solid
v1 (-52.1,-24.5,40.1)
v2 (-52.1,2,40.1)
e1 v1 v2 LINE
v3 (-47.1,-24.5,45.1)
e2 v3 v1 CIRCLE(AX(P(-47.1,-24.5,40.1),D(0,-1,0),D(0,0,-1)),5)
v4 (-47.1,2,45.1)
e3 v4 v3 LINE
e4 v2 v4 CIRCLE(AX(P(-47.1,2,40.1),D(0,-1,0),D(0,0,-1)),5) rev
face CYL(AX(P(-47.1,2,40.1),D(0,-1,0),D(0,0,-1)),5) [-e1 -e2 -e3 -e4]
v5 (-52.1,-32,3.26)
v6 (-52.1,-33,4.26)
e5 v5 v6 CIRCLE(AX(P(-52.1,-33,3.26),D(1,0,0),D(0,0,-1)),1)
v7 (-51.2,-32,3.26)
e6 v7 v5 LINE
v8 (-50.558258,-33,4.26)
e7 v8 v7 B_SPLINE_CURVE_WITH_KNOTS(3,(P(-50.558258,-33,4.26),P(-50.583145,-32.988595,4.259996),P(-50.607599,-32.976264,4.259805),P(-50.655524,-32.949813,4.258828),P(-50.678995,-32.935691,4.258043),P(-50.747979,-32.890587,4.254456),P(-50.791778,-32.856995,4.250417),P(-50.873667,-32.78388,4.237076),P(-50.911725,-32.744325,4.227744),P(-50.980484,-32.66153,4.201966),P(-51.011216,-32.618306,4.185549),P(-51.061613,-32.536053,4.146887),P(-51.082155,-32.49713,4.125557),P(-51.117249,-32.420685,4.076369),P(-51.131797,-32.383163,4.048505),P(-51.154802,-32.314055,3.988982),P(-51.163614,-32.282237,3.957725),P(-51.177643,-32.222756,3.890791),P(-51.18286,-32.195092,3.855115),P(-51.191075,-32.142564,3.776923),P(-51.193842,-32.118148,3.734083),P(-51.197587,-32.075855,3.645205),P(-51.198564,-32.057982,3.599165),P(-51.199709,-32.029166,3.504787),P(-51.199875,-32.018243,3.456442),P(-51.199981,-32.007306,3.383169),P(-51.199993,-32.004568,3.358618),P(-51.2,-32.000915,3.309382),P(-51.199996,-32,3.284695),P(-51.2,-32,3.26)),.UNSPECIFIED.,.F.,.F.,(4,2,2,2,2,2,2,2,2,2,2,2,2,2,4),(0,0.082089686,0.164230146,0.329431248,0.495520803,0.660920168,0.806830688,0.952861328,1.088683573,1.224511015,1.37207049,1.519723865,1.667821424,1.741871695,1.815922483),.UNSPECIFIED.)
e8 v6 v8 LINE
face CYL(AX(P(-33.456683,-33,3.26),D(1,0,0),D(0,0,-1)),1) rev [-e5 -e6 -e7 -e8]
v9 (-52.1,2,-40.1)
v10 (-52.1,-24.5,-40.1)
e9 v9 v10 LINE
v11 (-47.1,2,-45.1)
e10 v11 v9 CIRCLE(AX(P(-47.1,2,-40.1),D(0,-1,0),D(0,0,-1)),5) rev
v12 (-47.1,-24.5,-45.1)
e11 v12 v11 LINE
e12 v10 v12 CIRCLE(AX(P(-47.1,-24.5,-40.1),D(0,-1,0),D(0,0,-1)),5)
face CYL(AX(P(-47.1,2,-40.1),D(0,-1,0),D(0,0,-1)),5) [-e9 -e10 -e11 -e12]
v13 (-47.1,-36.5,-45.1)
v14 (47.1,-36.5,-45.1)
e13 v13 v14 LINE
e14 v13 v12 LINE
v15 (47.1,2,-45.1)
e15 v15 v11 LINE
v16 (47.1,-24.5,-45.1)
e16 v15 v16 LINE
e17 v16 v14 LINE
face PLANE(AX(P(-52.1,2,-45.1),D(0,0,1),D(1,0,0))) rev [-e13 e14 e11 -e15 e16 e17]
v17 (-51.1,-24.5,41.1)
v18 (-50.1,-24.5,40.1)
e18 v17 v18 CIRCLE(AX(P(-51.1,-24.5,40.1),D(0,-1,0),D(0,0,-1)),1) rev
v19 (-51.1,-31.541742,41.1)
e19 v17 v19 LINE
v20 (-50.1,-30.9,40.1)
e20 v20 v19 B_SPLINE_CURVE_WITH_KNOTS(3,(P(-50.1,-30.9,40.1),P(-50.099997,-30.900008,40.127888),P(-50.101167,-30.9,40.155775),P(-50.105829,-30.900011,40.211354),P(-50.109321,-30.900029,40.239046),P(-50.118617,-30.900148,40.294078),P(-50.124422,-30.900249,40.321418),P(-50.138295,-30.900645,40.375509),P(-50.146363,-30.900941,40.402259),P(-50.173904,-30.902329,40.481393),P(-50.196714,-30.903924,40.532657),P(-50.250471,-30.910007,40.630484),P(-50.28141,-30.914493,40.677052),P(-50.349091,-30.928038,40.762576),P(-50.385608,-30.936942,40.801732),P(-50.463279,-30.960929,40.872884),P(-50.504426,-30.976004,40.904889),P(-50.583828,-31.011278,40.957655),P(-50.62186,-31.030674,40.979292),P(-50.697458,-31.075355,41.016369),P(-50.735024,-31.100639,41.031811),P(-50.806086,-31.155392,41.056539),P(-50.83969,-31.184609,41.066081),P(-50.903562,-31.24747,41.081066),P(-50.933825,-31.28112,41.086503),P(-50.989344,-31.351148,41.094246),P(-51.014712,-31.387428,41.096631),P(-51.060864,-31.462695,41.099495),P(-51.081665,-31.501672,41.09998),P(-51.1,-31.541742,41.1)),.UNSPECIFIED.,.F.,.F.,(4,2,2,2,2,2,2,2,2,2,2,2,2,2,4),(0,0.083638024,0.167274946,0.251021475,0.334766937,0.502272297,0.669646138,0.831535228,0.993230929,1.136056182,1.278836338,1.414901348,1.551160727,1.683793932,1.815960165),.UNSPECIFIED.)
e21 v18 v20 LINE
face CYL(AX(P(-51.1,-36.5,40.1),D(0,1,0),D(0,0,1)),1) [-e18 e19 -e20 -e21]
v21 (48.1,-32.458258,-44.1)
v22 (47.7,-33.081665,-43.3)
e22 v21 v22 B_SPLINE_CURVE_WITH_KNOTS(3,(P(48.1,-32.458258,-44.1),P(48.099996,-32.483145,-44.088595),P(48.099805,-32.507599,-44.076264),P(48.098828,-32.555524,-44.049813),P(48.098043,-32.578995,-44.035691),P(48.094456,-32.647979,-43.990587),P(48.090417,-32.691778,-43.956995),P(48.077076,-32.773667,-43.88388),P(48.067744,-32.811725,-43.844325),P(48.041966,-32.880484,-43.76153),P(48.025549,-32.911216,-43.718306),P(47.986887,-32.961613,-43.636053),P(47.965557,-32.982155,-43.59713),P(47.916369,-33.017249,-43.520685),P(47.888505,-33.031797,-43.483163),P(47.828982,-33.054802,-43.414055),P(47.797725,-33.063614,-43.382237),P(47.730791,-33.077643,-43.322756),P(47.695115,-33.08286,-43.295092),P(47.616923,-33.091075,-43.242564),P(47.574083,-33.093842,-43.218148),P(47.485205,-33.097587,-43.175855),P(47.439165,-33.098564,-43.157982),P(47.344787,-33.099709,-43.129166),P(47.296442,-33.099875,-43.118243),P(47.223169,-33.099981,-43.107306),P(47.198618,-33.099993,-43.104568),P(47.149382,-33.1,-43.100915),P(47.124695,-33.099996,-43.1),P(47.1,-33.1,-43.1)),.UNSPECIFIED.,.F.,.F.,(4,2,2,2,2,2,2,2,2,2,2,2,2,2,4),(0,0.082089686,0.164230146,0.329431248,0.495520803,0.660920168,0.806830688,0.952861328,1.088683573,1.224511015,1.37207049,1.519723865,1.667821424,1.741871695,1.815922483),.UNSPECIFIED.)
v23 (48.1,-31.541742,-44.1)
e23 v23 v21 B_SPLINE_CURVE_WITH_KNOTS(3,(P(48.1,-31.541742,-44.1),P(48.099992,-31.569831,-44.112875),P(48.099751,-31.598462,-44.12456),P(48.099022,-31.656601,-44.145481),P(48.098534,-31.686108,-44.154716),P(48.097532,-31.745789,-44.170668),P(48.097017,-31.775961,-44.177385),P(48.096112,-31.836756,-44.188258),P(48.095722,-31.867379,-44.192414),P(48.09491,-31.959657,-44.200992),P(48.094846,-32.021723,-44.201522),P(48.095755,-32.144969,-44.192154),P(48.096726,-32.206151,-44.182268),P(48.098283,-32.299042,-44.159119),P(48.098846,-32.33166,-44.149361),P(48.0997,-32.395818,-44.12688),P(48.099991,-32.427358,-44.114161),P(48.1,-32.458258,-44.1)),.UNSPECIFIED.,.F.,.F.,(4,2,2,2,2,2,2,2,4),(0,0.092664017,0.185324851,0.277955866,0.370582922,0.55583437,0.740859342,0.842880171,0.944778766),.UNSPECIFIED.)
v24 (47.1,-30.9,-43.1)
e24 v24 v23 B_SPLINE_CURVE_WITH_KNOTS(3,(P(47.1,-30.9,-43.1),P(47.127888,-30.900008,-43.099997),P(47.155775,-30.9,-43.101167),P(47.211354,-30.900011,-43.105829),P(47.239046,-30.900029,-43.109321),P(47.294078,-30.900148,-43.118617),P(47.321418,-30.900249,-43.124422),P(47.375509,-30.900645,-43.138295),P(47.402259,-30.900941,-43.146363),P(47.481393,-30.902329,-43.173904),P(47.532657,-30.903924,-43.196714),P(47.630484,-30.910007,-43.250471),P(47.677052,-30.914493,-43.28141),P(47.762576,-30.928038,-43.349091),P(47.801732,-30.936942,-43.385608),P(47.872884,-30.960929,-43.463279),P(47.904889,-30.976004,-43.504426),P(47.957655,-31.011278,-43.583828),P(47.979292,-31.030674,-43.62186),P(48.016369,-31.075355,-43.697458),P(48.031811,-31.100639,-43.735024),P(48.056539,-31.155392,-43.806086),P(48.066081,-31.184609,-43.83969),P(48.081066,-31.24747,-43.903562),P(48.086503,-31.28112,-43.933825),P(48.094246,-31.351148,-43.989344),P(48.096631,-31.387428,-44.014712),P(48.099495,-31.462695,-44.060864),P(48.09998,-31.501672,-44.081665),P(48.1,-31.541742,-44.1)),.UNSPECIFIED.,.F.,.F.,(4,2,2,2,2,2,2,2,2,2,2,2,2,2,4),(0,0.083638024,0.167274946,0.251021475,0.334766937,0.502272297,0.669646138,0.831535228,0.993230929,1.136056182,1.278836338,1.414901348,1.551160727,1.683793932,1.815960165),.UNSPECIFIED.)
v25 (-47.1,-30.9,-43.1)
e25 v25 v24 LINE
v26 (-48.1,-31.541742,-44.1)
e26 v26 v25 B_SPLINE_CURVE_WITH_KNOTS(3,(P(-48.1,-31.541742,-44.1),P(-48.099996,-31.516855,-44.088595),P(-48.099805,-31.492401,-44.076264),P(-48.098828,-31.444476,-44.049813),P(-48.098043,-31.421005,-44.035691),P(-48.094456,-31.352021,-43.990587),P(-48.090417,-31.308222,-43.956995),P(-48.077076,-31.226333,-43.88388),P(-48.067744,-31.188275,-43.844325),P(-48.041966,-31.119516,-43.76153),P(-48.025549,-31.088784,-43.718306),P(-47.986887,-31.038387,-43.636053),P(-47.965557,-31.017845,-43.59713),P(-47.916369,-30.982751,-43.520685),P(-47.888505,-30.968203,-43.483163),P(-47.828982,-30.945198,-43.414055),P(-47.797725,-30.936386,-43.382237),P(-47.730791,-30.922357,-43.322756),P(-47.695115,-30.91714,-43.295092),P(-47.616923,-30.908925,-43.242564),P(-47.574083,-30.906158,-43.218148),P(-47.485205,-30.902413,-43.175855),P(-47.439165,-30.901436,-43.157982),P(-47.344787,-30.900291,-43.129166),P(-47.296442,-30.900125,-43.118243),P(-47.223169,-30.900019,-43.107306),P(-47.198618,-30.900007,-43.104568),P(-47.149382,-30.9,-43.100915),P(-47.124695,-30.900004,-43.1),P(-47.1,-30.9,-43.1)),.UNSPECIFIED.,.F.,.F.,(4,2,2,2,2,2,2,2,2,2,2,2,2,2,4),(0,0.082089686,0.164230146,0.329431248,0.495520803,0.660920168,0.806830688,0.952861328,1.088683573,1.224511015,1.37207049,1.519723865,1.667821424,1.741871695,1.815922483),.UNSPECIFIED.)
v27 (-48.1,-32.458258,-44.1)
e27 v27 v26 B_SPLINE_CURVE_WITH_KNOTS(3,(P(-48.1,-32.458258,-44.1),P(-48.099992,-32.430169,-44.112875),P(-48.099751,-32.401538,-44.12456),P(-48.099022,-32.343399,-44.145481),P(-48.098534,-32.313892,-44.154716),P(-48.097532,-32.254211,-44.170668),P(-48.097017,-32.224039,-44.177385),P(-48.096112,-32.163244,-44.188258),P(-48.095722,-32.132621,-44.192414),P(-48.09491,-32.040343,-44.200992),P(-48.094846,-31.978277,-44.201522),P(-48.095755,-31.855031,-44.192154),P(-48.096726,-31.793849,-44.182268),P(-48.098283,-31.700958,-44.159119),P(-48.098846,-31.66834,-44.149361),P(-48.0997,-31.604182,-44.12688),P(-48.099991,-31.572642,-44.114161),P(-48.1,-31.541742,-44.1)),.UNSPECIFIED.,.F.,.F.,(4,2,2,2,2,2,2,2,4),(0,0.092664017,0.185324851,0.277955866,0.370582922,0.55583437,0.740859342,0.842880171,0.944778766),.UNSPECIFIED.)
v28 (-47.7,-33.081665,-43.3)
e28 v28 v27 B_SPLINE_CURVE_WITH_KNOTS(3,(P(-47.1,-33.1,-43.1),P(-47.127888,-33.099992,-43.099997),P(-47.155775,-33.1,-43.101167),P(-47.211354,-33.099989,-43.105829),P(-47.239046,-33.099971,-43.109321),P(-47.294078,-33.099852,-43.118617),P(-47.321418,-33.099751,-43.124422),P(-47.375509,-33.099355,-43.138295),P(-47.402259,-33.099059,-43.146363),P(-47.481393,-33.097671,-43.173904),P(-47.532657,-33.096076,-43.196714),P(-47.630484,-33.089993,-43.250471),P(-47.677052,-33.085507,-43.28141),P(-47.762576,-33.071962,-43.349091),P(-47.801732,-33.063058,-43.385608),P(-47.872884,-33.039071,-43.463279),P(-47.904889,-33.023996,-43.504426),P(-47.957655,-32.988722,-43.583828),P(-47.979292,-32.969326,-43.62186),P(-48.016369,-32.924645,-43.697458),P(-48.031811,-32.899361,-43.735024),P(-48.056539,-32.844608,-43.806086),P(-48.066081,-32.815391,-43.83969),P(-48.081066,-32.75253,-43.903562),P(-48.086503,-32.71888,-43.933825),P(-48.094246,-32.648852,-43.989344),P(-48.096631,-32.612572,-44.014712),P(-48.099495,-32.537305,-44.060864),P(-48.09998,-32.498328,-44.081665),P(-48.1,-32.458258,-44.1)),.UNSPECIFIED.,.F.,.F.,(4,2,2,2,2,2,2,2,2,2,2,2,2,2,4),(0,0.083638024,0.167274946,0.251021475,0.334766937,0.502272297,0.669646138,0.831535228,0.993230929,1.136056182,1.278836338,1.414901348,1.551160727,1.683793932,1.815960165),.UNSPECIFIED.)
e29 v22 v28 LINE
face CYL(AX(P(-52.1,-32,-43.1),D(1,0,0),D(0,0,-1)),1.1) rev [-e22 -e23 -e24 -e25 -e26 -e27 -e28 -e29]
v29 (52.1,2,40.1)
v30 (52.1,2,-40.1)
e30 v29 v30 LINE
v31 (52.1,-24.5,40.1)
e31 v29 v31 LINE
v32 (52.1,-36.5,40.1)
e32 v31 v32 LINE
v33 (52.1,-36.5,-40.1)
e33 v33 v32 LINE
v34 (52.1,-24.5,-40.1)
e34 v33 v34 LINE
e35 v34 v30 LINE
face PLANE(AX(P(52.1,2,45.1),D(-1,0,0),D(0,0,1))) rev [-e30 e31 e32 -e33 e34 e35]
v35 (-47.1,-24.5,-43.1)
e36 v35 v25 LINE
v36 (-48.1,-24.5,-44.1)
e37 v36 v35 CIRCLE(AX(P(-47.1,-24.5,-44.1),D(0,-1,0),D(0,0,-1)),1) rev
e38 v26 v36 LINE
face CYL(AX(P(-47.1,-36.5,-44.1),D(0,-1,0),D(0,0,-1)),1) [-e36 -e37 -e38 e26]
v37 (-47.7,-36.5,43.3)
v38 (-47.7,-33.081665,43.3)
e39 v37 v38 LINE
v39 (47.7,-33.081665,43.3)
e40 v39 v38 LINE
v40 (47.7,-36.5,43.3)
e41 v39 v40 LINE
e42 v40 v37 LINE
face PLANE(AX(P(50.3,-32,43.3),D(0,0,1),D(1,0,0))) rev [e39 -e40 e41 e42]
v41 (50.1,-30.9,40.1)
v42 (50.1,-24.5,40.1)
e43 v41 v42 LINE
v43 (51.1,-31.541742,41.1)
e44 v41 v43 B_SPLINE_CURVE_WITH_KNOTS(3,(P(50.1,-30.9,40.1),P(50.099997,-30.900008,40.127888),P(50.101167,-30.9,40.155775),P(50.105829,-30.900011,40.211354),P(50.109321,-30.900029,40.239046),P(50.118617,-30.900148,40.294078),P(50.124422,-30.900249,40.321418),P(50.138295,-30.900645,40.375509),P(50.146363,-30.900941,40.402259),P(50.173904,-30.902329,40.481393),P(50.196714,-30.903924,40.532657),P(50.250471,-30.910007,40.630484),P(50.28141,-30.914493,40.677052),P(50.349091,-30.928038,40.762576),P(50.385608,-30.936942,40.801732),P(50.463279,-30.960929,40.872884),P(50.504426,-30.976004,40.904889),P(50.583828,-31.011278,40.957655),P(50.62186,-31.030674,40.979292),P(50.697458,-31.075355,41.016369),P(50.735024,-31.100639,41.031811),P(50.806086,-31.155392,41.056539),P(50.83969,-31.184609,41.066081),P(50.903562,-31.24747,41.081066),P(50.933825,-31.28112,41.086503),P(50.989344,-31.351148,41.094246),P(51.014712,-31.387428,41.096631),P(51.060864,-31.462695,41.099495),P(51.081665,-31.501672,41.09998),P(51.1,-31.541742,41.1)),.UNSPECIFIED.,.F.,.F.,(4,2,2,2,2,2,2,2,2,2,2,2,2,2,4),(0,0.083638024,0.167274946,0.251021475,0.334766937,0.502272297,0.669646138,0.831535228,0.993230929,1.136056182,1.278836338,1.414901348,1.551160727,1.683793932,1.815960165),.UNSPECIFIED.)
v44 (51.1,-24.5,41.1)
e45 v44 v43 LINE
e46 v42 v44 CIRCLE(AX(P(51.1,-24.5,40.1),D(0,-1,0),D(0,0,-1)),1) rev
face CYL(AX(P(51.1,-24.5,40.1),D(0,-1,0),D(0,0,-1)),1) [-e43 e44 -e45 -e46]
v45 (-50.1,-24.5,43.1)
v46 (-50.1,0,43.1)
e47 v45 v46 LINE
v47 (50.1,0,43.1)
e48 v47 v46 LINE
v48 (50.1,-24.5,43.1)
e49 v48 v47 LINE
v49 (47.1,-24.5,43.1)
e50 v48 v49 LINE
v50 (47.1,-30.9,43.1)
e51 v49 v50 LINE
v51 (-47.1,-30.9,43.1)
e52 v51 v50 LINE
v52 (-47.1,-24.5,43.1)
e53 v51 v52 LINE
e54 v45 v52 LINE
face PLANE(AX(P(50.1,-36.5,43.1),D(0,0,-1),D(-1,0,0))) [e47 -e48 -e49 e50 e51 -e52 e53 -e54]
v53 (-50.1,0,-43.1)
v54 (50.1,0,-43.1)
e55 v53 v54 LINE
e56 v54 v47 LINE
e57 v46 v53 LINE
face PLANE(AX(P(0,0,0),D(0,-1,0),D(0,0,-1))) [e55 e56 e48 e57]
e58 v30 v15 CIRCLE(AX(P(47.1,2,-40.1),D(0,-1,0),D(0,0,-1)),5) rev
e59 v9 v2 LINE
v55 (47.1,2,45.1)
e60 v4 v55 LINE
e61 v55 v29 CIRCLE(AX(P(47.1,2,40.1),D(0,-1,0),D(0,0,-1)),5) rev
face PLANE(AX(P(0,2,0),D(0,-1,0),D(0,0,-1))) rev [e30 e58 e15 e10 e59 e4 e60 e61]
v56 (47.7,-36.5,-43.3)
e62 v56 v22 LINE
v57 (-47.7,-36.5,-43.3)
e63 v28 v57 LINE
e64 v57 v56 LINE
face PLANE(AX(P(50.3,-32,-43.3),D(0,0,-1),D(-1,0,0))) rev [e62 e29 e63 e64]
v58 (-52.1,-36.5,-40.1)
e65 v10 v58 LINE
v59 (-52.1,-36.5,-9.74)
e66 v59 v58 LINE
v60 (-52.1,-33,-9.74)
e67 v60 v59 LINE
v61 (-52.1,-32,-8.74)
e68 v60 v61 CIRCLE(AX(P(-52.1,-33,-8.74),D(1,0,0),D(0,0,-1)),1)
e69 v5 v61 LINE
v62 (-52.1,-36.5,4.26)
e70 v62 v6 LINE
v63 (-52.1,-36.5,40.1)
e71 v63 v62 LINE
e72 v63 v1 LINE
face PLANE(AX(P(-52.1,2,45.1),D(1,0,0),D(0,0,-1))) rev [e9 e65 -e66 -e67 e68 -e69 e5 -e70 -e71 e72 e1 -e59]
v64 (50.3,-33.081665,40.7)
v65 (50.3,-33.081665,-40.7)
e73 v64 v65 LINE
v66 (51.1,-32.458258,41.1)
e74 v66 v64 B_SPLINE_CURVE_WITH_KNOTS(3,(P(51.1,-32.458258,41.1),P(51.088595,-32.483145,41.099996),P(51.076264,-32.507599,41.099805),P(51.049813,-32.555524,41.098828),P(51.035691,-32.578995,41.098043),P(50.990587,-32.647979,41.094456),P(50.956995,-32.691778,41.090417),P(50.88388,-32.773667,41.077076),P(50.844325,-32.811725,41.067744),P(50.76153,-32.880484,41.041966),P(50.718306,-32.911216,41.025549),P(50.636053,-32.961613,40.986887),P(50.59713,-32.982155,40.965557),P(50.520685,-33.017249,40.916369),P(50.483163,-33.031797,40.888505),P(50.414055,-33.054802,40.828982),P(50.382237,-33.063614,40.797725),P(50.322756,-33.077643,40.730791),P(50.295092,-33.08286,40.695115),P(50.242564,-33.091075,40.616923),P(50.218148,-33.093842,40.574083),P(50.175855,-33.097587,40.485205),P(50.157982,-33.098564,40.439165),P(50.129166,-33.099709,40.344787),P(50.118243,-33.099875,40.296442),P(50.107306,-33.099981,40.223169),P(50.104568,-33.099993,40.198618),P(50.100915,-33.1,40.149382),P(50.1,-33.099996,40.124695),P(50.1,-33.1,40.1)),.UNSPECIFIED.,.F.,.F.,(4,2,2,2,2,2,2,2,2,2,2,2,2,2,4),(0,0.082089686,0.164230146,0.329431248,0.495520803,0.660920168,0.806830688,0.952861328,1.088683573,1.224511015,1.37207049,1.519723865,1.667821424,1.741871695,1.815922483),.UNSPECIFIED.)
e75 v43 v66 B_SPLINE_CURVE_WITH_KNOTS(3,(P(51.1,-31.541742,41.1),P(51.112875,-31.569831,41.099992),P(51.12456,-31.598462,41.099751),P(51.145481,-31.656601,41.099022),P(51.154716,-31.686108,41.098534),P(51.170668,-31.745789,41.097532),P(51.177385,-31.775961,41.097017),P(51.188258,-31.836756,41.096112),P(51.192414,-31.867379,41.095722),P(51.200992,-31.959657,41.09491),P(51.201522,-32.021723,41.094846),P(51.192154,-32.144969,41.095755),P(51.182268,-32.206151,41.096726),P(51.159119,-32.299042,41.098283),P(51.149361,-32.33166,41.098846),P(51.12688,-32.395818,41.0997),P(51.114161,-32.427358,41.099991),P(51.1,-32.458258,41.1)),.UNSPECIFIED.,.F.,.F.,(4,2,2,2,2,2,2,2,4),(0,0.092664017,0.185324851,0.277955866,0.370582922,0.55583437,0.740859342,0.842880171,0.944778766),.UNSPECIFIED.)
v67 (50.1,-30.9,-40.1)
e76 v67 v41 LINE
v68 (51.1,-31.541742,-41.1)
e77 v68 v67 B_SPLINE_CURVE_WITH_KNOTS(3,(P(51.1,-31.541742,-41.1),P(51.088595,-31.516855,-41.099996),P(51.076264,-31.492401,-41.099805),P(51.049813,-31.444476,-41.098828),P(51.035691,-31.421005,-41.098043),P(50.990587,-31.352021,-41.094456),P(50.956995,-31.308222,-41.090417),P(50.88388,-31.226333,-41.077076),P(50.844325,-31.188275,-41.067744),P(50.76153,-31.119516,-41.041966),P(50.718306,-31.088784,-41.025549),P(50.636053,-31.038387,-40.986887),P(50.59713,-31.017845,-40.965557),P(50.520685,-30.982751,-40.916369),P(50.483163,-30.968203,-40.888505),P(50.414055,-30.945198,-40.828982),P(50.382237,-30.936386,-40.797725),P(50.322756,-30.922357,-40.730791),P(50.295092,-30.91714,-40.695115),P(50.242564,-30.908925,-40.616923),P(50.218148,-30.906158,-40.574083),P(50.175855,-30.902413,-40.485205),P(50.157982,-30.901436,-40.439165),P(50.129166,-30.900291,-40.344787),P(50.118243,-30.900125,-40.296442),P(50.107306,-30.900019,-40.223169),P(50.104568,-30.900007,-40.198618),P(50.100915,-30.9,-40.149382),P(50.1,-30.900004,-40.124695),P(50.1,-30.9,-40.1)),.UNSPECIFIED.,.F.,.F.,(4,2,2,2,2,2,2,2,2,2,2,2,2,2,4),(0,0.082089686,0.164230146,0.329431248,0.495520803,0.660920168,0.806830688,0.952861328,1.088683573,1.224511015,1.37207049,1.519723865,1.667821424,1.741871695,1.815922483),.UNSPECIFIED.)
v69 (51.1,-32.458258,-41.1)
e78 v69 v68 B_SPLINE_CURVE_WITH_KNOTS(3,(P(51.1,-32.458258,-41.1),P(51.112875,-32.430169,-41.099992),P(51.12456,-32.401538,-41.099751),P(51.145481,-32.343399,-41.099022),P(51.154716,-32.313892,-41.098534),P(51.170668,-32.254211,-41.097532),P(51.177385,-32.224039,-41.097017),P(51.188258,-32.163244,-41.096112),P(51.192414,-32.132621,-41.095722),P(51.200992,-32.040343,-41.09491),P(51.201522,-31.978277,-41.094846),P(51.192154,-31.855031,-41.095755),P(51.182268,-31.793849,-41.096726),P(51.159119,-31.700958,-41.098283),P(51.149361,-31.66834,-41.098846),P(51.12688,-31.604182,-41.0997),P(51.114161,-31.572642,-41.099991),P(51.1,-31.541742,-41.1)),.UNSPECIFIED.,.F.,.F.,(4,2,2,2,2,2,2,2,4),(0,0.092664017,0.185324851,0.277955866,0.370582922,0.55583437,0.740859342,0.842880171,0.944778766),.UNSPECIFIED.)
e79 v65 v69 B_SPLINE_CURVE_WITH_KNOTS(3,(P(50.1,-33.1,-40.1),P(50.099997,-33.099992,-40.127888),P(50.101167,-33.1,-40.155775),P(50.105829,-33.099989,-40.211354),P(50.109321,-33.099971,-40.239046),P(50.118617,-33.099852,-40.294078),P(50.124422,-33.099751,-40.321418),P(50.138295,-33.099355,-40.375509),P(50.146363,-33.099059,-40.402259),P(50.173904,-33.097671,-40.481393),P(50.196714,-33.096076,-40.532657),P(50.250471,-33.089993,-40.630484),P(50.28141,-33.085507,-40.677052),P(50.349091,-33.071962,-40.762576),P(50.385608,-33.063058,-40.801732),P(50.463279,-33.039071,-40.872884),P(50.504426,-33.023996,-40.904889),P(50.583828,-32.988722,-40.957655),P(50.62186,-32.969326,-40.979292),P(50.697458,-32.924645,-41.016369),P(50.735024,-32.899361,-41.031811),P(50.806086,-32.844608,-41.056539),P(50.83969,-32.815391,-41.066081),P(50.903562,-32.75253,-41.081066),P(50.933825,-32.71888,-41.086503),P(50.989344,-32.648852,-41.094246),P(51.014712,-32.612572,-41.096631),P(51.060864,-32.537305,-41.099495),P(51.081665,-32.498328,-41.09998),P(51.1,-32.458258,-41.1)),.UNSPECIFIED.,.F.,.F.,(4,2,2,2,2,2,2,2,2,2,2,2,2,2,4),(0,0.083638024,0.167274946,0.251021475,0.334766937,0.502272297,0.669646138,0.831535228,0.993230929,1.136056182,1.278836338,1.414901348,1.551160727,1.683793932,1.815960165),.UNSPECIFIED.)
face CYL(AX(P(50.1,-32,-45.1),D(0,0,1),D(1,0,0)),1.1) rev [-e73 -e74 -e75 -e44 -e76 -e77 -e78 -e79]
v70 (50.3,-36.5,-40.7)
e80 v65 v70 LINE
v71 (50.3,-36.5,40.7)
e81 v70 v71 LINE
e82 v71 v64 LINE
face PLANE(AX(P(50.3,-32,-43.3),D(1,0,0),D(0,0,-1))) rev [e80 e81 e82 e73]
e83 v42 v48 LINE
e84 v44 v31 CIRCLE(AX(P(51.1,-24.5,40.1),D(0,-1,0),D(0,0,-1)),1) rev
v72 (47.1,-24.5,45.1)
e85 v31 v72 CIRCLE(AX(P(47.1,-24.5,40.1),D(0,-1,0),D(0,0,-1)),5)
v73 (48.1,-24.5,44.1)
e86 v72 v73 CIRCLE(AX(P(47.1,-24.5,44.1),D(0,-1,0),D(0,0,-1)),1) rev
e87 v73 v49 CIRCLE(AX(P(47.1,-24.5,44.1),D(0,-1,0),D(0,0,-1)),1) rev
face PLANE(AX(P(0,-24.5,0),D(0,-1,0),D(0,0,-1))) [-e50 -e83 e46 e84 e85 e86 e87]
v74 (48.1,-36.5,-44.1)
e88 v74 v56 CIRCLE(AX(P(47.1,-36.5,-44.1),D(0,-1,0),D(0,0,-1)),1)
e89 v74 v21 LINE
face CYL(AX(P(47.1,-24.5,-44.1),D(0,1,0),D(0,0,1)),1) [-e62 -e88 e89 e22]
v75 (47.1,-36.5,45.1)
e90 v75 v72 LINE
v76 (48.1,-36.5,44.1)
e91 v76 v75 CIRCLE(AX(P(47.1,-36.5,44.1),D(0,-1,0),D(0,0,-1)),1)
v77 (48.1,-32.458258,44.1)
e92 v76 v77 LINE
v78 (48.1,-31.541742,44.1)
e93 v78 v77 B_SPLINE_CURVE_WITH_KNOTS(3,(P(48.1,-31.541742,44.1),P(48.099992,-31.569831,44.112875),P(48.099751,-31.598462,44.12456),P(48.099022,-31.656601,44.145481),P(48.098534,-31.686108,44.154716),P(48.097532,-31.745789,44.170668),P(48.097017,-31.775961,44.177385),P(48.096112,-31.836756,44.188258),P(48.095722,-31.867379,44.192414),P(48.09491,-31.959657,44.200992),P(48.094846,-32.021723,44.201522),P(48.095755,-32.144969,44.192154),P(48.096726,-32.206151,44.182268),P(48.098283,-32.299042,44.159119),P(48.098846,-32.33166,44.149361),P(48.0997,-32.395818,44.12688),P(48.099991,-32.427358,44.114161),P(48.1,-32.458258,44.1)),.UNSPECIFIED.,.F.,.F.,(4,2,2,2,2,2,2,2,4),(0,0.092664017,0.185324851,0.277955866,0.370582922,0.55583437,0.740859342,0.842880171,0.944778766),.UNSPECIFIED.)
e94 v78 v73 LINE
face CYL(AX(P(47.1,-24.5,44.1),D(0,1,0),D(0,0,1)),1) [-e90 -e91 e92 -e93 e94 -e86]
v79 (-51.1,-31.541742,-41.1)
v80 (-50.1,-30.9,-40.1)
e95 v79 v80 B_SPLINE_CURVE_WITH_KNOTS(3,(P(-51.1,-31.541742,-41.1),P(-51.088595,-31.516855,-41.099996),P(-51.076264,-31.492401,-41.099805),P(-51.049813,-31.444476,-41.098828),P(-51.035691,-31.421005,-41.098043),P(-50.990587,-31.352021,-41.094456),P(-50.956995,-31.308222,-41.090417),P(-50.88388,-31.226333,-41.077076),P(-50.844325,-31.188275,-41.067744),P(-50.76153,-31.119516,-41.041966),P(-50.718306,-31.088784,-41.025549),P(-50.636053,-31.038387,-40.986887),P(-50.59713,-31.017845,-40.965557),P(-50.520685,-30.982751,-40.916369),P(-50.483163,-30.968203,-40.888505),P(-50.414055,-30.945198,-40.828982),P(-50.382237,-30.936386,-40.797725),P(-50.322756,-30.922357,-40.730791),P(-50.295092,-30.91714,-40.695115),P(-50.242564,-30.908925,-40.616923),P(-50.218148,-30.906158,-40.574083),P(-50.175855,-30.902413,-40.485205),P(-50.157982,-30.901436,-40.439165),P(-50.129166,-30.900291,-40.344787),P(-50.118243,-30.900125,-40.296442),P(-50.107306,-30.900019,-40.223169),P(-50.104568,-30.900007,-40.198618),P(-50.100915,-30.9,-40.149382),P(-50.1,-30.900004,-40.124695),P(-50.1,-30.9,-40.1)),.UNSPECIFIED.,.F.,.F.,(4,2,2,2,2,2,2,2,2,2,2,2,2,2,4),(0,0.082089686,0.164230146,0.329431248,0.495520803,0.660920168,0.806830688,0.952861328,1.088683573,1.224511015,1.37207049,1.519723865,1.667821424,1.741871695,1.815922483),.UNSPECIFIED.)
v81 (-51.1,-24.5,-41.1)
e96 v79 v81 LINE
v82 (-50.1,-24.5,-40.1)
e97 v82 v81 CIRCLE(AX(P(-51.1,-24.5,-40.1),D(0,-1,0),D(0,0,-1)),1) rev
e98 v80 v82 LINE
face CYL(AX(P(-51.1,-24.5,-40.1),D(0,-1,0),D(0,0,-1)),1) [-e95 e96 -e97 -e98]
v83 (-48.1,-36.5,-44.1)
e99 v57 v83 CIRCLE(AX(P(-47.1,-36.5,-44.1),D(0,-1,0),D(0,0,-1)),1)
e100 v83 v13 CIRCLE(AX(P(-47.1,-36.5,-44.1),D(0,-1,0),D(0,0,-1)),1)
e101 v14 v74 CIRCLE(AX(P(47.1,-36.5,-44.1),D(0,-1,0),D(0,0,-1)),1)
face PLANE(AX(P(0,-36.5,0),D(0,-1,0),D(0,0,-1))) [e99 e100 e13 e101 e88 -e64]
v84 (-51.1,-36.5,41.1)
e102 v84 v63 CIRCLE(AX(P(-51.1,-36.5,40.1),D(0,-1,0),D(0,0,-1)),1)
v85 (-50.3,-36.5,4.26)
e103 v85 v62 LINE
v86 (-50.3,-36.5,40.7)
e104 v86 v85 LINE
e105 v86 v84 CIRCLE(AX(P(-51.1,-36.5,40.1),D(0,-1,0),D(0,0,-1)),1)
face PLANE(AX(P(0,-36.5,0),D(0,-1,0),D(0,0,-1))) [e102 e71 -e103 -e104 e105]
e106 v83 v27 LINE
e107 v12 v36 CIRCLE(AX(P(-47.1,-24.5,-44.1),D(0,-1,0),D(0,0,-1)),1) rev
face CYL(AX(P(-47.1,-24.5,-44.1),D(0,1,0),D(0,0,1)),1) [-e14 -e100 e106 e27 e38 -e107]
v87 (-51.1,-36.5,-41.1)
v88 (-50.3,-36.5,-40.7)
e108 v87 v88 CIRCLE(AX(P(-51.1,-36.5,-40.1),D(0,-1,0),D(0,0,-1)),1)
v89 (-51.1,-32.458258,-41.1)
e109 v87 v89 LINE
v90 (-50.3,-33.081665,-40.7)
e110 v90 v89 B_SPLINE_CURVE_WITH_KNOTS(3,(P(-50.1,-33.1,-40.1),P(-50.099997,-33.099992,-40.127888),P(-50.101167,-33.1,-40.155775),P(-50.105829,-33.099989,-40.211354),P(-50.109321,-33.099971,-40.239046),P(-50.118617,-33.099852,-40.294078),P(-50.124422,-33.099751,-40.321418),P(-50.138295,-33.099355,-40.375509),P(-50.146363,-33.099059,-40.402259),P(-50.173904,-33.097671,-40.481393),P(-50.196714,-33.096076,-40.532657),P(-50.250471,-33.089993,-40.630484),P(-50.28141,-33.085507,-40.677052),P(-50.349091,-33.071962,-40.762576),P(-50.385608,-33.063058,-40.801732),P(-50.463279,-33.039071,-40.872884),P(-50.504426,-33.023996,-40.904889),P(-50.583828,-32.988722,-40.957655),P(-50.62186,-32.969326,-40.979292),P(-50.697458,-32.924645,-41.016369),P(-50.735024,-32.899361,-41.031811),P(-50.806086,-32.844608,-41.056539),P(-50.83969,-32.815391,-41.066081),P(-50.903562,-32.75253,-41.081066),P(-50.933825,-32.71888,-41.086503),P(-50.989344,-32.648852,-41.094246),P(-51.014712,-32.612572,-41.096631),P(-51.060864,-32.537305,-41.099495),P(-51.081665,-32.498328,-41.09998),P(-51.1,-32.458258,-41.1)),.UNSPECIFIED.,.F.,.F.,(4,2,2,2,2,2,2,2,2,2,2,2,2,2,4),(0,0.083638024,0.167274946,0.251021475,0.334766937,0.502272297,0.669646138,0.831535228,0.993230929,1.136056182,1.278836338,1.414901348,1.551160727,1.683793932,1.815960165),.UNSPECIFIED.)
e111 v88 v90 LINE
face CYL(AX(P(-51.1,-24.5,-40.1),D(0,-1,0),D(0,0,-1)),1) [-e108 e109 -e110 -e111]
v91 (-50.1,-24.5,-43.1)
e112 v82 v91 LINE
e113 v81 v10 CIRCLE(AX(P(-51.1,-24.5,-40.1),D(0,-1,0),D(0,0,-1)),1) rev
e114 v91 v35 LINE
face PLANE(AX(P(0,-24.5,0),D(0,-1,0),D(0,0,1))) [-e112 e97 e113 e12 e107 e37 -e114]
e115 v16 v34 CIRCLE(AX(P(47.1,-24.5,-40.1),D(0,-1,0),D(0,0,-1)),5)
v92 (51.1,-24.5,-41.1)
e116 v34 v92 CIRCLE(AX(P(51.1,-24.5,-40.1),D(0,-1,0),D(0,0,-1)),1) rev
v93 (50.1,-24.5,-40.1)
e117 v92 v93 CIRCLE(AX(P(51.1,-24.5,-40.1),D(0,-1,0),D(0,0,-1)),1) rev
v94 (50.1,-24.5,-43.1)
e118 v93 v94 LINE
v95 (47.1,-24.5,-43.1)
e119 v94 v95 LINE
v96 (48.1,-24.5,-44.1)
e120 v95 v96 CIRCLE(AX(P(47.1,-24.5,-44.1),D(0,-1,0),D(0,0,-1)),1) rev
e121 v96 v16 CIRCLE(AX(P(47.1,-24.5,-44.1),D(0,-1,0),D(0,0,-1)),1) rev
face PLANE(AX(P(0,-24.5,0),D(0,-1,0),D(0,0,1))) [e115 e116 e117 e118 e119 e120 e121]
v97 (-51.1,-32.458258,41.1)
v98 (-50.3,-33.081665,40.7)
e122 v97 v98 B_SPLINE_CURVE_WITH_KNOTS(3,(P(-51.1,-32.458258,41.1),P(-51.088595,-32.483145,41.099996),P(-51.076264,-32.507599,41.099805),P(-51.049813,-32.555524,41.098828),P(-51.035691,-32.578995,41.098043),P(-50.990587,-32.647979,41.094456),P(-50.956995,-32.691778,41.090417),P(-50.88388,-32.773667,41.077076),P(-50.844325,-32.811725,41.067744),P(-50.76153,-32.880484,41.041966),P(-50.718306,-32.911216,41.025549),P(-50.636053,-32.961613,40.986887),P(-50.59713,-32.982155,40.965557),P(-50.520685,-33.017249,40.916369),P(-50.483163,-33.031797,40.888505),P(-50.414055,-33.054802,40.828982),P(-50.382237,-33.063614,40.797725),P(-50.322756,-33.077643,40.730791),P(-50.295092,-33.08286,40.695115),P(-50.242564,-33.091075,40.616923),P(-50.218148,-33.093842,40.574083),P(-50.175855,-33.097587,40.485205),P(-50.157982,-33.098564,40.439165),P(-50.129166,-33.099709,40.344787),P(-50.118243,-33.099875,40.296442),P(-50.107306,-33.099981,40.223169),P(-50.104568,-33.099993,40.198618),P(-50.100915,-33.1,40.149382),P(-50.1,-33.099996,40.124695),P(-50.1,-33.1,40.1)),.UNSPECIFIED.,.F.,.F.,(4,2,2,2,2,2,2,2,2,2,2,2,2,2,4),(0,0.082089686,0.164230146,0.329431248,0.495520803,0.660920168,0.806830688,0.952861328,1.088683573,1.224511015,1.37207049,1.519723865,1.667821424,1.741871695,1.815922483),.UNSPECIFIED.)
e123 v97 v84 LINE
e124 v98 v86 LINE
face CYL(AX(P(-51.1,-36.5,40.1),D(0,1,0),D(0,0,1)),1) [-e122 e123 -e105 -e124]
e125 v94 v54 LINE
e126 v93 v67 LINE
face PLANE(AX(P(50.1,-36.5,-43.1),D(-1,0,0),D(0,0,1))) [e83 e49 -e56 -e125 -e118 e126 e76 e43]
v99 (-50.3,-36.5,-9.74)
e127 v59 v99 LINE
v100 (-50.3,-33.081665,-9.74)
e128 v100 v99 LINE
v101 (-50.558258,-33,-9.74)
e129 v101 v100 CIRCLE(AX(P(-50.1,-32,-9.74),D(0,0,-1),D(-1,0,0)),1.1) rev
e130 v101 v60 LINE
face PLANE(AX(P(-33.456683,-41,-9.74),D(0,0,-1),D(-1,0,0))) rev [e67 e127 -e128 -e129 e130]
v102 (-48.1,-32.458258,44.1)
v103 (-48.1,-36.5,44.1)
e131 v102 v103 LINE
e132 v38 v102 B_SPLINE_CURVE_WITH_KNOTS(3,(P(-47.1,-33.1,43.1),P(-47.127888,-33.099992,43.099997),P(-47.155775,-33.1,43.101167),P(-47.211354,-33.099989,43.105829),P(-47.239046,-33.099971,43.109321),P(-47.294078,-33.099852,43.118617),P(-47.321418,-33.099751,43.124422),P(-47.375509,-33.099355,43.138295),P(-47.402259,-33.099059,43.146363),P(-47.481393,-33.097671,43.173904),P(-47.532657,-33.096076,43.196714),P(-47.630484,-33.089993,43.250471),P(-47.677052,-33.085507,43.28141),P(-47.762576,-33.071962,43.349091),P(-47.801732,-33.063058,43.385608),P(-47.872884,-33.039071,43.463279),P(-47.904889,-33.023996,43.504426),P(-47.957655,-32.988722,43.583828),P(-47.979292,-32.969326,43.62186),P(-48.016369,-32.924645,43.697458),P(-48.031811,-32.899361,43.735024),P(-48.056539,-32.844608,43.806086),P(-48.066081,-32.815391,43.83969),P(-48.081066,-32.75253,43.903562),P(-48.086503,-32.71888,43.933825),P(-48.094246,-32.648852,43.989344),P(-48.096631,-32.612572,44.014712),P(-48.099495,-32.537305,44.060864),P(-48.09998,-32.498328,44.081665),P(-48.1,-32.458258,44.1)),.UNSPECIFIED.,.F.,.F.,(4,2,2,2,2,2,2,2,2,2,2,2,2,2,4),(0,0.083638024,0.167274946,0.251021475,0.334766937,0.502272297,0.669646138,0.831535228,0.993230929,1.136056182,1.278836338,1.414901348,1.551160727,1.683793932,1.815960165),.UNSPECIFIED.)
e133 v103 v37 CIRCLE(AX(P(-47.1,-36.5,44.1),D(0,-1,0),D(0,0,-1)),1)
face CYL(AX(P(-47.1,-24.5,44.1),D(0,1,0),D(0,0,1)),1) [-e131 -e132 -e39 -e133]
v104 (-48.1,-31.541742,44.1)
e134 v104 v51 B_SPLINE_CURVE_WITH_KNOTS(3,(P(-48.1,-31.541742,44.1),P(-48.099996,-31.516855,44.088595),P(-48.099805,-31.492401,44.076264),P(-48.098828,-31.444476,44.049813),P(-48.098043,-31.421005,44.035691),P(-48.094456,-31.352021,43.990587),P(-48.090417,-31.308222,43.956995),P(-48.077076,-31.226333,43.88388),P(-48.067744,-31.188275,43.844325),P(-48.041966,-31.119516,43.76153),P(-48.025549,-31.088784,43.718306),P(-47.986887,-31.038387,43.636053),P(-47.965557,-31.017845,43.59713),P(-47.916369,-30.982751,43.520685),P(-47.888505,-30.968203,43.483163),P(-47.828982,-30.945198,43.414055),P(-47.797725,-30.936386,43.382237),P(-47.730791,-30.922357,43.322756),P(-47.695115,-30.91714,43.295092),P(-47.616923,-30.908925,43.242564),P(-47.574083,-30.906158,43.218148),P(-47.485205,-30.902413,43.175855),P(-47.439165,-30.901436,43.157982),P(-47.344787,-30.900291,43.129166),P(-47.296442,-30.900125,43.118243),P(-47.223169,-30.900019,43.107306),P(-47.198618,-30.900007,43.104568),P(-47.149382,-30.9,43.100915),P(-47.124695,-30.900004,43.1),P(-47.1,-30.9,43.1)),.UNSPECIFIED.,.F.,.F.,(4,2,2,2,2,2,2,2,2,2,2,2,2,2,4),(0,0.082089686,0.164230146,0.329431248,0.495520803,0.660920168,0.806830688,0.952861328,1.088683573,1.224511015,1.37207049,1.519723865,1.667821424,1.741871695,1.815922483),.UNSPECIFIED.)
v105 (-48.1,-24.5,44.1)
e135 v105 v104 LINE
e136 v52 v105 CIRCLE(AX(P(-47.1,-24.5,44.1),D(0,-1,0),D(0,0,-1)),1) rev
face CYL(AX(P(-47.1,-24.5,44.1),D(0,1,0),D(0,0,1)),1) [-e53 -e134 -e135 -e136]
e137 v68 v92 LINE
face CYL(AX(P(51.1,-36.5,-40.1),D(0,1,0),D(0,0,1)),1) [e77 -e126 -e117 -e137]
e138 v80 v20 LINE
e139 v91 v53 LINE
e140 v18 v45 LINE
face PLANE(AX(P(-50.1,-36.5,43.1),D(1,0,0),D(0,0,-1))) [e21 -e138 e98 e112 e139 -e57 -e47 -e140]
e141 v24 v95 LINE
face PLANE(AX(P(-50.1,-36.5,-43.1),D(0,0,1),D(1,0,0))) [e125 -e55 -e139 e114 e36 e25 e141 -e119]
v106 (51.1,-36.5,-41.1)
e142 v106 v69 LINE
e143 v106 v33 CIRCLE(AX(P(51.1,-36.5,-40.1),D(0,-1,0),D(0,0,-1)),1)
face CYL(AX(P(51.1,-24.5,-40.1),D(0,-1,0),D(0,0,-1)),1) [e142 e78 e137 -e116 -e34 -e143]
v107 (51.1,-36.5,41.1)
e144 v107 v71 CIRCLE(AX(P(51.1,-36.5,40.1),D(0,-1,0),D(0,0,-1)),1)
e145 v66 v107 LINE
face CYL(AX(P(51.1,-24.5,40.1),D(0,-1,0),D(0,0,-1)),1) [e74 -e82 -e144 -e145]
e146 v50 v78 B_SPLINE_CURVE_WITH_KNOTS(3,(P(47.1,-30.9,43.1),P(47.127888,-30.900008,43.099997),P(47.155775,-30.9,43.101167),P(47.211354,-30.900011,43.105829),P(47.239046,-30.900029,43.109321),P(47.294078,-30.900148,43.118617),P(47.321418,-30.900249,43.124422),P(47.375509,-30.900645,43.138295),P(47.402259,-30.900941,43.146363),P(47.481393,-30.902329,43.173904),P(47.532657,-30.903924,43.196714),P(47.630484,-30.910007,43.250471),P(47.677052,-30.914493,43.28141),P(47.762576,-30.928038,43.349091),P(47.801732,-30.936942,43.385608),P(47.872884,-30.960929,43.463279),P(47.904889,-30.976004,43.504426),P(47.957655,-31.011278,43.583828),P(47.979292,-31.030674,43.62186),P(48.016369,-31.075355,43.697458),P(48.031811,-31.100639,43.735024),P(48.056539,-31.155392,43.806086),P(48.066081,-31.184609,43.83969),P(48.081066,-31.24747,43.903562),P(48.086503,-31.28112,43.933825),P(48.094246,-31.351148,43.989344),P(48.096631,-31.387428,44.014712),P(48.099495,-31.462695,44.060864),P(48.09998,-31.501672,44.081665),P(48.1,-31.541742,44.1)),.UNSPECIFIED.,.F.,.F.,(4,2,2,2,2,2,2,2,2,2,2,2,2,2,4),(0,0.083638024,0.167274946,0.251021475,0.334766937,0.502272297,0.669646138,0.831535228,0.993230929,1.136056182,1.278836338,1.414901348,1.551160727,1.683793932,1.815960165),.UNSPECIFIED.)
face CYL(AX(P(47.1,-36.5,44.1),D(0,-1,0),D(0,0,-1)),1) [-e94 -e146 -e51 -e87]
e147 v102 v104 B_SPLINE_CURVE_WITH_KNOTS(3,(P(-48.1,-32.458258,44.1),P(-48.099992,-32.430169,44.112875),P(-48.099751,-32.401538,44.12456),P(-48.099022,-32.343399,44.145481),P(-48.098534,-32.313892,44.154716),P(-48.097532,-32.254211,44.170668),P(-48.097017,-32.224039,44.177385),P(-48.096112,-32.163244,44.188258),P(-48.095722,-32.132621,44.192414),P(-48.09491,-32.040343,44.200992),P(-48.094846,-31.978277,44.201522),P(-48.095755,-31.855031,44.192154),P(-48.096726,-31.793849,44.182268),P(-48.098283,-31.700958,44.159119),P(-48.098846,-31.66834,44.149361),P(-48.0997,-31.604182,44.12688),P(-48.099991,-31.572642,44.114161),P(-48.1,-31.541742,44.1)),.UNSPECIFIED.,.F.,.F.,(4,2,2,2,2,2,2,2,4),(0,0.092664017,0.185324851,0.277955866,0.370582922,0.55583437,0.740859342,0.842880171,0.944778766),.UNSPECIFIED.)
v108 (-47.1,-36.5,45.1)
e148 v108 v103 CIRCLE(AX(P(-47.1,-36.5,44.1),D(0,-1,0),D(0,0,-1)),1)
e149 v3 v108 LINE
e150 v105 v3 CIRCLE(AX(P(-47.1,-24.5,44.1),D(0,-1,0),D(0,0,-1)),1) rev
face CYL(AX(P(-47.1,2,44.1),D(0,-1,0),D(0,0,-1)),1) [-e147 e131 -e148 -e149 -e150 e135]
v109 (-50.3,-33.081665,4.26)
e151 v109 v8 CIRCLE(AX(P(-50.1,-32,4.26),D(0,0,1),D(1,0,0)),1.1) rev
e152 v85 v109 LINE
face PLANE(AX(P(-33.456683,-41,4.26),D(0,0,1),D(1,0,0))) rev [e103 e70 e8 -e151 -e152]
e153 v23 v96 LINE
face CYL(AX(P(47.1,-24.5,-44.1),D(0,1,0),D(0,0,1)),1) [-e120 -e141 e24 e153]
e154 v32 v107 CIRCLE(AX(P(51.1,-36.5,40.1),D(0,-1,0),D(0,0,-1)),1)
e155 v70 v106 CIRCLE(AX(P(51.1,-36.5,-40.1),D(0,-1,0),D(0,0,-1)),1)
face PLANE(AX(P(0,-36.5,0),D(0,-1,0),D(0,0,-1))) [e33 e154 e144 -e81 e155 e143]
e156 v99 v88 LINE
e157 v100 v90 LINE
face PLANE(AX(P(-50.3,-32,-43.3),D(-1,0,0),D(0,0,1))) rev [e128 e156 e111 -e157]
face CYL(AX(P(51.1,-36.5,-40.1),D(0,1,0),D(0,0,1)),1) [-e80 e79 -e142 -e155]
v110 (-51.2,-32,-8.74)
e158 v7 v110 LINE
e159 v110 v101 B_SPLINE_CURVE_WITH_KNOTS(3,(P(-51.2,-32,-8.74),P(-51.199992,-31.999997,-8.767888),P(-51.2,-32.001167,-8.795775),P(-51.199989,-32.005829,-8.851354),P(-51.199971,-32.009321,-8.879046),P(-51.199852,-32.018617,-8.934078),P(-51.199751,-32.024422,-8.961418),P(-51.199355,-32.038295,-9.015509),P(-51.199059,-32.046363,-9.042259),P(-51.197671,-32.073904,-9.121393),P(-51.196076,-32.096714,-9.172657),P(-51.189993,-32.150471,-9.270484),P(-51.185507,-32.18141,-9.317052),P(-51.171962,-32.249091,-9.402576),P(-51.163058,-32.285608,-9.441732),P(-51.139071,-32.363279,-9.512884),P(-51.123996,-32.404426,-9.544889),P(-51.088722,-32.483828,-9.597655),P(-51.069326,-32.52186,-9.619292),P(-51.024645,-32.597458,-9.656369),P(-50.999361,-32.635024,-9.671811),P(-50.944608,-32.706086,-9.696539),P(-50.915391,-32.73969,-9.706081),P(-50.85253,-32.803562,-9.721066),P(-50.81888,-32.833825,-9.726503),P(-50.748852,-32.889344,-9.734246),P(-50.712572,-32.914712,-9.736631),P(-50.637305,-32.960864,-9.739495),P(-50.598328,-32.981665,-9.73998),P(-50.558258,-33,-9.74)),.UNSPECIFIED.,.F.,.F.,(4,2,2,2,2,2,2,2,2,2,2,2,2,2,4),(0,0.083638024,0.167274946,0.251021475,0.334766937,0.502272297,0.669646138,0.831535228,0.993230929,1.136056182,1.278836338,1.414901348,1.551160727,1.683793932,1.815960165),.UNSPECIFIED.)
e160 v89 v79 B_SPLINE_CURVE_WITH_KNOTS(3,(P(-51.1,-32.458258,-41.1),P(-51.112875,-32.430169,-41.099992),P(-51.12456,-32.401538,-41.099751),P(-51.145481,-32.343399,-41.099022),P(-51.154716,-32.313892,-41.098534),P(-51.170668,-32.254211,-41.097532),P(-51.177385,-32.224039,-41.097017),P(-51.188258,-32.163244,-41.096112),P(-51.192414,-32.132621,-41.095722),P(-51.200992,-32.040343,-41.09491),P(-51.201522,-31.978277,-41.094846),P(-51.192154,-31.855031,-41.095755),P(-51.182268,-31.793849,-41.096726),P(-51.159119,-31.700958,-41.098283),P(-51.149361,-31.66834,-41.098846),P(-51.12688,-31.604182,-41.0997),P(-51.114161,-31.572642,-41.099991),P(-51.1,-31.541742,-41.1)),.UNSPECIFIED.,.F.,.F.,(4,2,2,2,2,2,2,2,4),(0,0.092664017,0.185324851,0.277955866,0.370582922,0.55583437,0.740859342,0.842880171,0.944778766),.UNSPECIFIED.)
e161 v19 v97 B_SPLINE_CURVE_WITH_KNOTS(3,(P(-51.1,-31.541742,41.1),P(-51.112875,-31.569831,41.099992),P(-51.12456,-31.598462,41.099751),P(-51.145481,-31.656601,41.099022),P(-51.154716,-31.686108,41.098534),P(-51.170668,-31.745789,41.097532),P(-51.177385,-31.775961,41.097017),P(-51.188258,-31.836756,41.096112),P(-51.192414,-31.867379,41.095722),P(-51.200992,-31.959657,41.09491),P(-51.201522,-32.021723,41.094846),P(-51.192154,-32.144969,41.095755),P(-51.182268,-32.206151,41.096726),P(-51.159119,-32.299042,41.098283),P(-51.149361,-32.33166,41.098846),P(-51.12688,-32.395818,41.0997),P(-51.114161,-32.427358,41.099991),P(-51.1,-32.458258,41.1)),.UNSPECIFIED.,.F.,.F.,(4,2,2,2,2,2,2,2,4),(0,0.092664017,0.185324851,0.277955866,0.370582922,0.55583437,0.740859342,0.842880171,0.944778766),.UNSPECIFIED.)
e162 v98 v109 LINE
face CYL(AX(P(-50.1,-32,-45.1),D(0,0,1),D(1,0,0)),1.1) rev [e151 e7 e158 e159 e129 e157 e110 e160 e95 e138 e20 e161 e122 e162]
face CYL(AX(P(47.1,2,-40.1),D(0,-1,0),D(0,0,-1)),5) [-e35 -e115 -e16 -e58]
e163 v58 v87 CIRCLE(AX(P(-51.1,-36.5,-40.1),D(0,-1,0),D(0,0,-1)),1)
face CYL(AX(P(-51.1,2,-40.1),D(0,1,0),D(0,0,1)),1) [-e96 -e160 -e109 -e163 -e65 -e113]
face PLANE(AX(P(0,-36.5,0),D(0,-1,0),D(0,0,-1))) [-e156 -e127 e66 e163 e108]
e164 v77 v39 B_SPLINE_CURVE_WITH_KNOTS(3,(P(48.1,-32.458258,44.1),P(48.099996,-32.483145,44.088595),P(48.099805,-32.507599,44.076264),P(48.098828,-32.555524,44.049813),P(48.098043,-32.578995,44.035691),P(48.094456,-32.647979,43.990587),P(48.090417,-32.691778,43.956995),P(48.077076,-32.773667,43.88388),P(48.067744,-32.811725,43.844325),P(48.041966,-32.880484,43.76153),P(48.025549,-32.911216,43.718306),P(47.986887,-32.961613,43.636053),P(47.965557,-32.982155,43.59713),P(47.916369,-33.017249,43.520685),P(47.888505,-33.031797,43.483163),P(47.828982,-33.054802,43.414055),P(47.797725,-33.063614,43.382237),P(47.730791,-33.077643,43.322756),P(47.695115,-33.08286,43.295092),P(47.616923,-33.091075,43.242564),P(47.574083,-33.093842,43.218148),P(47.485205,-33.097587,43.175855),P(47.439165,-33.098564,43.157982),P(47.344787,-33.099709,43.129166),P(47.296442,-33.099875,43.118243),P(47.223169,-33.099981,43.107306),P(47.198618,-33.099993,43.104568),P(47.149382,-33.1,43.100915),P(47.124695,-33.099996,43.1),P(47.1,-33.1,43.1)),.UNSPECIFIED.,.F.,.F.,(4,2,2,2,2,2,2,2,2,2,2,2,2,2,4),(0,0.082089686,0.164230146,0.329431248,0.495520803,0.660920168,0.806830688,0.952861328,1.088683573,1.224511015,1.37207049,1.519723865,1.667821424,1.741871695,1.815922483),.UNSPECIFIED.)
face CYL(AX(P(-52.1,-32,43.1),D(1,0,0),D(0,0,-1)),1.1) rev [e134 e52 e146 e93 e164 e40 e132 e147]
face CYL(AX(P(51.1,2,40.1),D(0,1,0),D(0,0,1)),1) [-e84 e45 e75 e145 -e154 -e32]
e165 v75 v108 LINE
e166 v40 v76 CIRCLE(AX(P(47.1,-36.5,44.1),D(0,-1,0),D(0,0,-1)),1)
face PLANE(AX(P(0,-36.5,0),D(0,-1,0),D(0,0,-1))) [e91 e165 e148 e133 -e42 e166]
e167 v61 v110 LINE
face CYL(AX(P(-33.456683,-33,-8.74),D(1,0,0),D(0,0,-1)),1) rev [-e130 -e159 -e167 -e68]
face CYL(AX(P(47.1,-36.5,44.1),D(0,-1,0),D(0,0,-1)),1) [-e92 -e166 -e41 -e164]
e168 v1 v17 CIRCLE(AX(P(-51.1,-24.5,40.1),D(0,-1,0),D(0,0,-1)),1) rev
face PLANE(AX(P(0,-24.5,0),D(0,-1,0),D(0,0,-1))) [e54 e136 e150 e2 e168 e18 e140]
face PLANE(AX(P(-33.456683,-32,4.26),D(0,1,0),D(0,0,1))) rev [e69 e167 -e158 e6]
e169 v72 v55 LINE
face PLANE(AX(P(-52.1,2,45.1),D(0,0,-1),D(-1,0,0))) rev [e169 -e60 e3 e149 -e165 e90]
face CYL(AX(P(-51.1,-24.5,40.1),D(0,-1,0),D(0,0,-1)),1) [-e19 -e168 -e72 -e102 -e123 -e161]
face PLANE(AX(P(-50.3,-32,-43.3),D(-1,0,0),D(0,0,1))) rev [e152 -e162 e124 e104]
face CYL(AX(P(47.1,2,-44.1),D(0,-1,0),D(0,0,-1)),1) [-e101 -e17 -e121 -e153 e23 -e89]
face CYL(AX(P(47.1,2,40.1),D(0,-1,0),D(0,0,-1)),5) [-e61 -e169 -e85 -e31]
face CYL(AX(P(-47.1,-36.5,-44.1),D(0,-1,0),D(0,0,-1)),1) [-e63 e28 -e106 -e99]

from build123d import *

# Parameters (mm, degrees)
ESQUISSE1_W              = 104.2
ESQUISSE1_H              = 90.2
BOSS_EXTRU_1_DEPTH       = 2
ESQUISSE2_W              = 104.2
ESQUISSE2_H              = 90.2
ESQUISSE2_W_2            = 100.2
ESQUISSE2_H_2            = 86.2
BOSS_EXTRU_2_DEPTH       = 36.5
ENL_V_MAT_EXTRU_1_DEPTH  = 12
SYM_TRIE2_COPY_1_DEPTH   = 12
CONG_3_R                 = 1
CONG_1_R                 = 5
ENL_V_MAT_EXTRU_2_DEPTH  = 78.978650924
ENL_V_MAT_EXTRU_3_DEPTH  = 78.978651027
ESQUISSE15_W             = 100.6
ESQUISSE15_H             = 86.6
ENL_V_MAT_EXTRU_10_DEPTH = 4.5
ENL_V_MAT_EXTRU_11_REACH = 121.264
ESQUISSE17_W             = 14
ESQUISSE17_H             = 9
CONG_4_R                 = 1


with BuildPart() as part:
    # Esquisse1 → Boss.-Extru.1 (new body)
    with BuildSketch(Plane(origin=(0, 0, 0), x_dir=(1, 0, 0), z_dir=(0, 1, 0))):
        Rectangle(ESQUISSE1_W, ESQUISSE1_H)
    extrude(amount=BOSS_EXTRU_1_DEPTH)

    # Esquisse2 → Boss.-Extru.2 (add)
    with BuildSketch(Plane.XZ):
        Rectangle(ESQUISSE2_W, ESQUISSE2_H)
        Rectangle(ESQUISSE2_W_2, ESQUISSE2_H_2, mode=Mode.SUBTRACT)
    extrude(amount=BOSS_EXTRU_2_DEPTH)

    # Esquisse3 → Enlèv. mat.-Extru.1 (cut)
    with BuildSketch(Plane.XZ.offset(36.5)):
        Polygon((-50.1, 41.1), (-50.1, 43.1), (-48.1, 43.1), (-48.1, 45.1), (-52.1, 45.1), (-52.1, 41.1), align=None)
    enl_v_mat_extru_1 = extrude(amount=-ENL_V_MAT_EXTRU_1_DEPTH, mode=Mode.SUBTRACT)

    # Symétrie1: Enlèv. mat.-Extru.1 across plane
    add(enl_v_mat_extru_1.mirror(Plane.XY), mode=Mode.SUBTRACT)

    # Symétrie2: Enlèv. mat.-Extru.1 across plane
    add(enl_v_mat_extru_1.mirror(Plane(origin=(0, 0, 0), x_dir=(0, 0, 1), z_dir=(1, 0, 0))), mode=Mode.SUBTRACT)

    # Symétrie2 copy 1 sketch → Symétrie2 copy 1 (cut)
    with BuildSketch(Plane(origin=(0, -36.5, 0), x_dir=(-1, 0, 0), z_dir=(0, -1, 0))):
        Polygon((-50.1, 41.1), (-50.1, 43.1), (-48.1, 43.1), (-48.1, 45.1), (-52.1, 45.1), (-52.1, 41.1), align=None)
    extrude(amount=-SYM_TRIE2_COPY_1_DEPTH, mode=Mode.SUBTRACT)

    # Congé3
    cong_3_edges = [part.edges().sort_by_distance(p)[0] for p in [
        (-48.1, -30.5, 45.1),
        (-48.1, -30.5, 43.1),
        (-50.1, -30.5, 41.1),
        (-52.1, -30.5, 41.1),
        (48.1, -30.5, 45.1),
        (48.1, -30.5, 43.1),
        (52.1, -30.5, 41.1),
        (50.1, -30.5, 41.1),
        (52.1, -30.5, -41.1),
        (50.1, -30.5, -41.1),
        (48.1, -30.5, -43.1),
        (48.1, -30.5, -45.1),
        (-48.1, -30.5, -45.1),
        (-48.1, -30.5, -43.1),
        (-50.1, -30.5, -41.1),
        (-52.1, -30.5, -41.1),
    ]]
    fillet(cong_3_edges, radius=CONG_3_R - 0.0001)  # a hair under: the kernel refuses the full size

    # Congé1
    cong_1_edges = [part.edges().sort_by_distance(p)[0] for p in [
        (52.1, -11.25, 45.1),
        (52.1, -11.25, -45.1),
        (-52.1, -11.25, -45.1),
        (-52.1, -11.25, 45.1),
    ]]
    fillet(cong_1_edges, radius=CONG_1_R)

    # Esquisse4 → Enlèv. mat.-Extru.2 (cut, symmetric)
    with BuildSketch(Plane(origin=(0, 0, 0), x_dir=(0, 0, -1), z_dir=(1, 0, 0))):
        with BuildLine():
            Line((-43.1, -30.9), (-43.1, -33.1))
            ThreePointArc((-43.1, -33.1), (-44.2, -32), (-43.1, -30.9))
        make_face()
    enl_v_mat_extru_2 = extrude(amount=ENL_V_MAT_EXTRU_2_DEPTH, both=True, mode=Mode.SUBTRACT)

    # Symétrie4: Enlèv. mat.-Extru.2 across plane
    add(enl_v_mat_extru_2.mirror(Plane.XY), mode=Mode.SUBTRACT)

    # Esquisse5 → Enlèv. mat.-Extru.3 (cut, symmetric)
    with BuildSketch(Plane.XY):
        with BuildLine():
            Line((-50.1, -30.9), (-50.1, -33.1))
            ThreePointArc((-50.1, -33.1), (-51.2, -32), (-50.1, -30.9))
        make_face()
    enl_v_mat_extru_3 = extrude(amount=ENL_V_MAT_EXTRU_3_DEPTH, both=True, mode=Mode.SUBTRACT)

    # Symétrie5: Enlèv. mat.-Extru.3 across plane
    add(enl_v_mat_extru_3.mirror(Plane(origin=(0, 0, 0), x_dir=(0, 0, 1), z_dir=(1, 0, 0))), mode=Mode.SUBTRACT)

    # Esquisse15 → Enlèv. mat.-Extru.10 (cut)
    with BuildSketch(Plane.XZ.offset(36.5)):
        Rectangle(ESQUISSE15_W, ESQUISSE15_H)
    extrude(amount=-ENL_V_MAT_EXTRU_10_DEPTH, mode=Mode.SUBTRACT)

    # Enlèv. mat.-Extru.11: up to this face of the body (flat: up to its plane)
    enl_v_mat_extru_11_end = Plane(part.part.faces().sort_by_distance((-50.1, -15.270818347, 0))[0])
    # Esquisse17 → Enlèv. mat.-Extru.11 (cut, up to the picked face)
    with BuildSketch(Plane.ZY.offset(52.1), mode=Mode.PRIVATE) as enl_v_mat_extru_11_sk1:
        with Locations((-2.74, -36.5)):
            Rectangle(ESQUISSE17_W, ESQUISSE17_H)
    enl_v_mat_extru_11_tool1 = split(extrude(enl_v_mat_extru_11_sk1.sketch, amount=-ENL_V_MAT_EXTRU_11_REACH, mode=Mode.PRIVATE), bisect_by=enl_v_mat_extru_11_end, keep=Keep.BOTH, mode=Mode.PRIVATE)
    add(enl_v_mat_extru_11_tool1.solids().sort_by(Axis((-52.1, -36.5, -2.74), (1, 0, 0)))[0], mode=Mode.SUBTRACT)

    # Congé4
    cong_4_edges = [part.edges().sort_by_distance(p)[0] for p in [
        (-51.65, -32, -9.74),
        (-51.65, -32, 4.26),
    ]]
    fillet(cong_4_edges, radius=CONG_4_R)


solid = part.part
